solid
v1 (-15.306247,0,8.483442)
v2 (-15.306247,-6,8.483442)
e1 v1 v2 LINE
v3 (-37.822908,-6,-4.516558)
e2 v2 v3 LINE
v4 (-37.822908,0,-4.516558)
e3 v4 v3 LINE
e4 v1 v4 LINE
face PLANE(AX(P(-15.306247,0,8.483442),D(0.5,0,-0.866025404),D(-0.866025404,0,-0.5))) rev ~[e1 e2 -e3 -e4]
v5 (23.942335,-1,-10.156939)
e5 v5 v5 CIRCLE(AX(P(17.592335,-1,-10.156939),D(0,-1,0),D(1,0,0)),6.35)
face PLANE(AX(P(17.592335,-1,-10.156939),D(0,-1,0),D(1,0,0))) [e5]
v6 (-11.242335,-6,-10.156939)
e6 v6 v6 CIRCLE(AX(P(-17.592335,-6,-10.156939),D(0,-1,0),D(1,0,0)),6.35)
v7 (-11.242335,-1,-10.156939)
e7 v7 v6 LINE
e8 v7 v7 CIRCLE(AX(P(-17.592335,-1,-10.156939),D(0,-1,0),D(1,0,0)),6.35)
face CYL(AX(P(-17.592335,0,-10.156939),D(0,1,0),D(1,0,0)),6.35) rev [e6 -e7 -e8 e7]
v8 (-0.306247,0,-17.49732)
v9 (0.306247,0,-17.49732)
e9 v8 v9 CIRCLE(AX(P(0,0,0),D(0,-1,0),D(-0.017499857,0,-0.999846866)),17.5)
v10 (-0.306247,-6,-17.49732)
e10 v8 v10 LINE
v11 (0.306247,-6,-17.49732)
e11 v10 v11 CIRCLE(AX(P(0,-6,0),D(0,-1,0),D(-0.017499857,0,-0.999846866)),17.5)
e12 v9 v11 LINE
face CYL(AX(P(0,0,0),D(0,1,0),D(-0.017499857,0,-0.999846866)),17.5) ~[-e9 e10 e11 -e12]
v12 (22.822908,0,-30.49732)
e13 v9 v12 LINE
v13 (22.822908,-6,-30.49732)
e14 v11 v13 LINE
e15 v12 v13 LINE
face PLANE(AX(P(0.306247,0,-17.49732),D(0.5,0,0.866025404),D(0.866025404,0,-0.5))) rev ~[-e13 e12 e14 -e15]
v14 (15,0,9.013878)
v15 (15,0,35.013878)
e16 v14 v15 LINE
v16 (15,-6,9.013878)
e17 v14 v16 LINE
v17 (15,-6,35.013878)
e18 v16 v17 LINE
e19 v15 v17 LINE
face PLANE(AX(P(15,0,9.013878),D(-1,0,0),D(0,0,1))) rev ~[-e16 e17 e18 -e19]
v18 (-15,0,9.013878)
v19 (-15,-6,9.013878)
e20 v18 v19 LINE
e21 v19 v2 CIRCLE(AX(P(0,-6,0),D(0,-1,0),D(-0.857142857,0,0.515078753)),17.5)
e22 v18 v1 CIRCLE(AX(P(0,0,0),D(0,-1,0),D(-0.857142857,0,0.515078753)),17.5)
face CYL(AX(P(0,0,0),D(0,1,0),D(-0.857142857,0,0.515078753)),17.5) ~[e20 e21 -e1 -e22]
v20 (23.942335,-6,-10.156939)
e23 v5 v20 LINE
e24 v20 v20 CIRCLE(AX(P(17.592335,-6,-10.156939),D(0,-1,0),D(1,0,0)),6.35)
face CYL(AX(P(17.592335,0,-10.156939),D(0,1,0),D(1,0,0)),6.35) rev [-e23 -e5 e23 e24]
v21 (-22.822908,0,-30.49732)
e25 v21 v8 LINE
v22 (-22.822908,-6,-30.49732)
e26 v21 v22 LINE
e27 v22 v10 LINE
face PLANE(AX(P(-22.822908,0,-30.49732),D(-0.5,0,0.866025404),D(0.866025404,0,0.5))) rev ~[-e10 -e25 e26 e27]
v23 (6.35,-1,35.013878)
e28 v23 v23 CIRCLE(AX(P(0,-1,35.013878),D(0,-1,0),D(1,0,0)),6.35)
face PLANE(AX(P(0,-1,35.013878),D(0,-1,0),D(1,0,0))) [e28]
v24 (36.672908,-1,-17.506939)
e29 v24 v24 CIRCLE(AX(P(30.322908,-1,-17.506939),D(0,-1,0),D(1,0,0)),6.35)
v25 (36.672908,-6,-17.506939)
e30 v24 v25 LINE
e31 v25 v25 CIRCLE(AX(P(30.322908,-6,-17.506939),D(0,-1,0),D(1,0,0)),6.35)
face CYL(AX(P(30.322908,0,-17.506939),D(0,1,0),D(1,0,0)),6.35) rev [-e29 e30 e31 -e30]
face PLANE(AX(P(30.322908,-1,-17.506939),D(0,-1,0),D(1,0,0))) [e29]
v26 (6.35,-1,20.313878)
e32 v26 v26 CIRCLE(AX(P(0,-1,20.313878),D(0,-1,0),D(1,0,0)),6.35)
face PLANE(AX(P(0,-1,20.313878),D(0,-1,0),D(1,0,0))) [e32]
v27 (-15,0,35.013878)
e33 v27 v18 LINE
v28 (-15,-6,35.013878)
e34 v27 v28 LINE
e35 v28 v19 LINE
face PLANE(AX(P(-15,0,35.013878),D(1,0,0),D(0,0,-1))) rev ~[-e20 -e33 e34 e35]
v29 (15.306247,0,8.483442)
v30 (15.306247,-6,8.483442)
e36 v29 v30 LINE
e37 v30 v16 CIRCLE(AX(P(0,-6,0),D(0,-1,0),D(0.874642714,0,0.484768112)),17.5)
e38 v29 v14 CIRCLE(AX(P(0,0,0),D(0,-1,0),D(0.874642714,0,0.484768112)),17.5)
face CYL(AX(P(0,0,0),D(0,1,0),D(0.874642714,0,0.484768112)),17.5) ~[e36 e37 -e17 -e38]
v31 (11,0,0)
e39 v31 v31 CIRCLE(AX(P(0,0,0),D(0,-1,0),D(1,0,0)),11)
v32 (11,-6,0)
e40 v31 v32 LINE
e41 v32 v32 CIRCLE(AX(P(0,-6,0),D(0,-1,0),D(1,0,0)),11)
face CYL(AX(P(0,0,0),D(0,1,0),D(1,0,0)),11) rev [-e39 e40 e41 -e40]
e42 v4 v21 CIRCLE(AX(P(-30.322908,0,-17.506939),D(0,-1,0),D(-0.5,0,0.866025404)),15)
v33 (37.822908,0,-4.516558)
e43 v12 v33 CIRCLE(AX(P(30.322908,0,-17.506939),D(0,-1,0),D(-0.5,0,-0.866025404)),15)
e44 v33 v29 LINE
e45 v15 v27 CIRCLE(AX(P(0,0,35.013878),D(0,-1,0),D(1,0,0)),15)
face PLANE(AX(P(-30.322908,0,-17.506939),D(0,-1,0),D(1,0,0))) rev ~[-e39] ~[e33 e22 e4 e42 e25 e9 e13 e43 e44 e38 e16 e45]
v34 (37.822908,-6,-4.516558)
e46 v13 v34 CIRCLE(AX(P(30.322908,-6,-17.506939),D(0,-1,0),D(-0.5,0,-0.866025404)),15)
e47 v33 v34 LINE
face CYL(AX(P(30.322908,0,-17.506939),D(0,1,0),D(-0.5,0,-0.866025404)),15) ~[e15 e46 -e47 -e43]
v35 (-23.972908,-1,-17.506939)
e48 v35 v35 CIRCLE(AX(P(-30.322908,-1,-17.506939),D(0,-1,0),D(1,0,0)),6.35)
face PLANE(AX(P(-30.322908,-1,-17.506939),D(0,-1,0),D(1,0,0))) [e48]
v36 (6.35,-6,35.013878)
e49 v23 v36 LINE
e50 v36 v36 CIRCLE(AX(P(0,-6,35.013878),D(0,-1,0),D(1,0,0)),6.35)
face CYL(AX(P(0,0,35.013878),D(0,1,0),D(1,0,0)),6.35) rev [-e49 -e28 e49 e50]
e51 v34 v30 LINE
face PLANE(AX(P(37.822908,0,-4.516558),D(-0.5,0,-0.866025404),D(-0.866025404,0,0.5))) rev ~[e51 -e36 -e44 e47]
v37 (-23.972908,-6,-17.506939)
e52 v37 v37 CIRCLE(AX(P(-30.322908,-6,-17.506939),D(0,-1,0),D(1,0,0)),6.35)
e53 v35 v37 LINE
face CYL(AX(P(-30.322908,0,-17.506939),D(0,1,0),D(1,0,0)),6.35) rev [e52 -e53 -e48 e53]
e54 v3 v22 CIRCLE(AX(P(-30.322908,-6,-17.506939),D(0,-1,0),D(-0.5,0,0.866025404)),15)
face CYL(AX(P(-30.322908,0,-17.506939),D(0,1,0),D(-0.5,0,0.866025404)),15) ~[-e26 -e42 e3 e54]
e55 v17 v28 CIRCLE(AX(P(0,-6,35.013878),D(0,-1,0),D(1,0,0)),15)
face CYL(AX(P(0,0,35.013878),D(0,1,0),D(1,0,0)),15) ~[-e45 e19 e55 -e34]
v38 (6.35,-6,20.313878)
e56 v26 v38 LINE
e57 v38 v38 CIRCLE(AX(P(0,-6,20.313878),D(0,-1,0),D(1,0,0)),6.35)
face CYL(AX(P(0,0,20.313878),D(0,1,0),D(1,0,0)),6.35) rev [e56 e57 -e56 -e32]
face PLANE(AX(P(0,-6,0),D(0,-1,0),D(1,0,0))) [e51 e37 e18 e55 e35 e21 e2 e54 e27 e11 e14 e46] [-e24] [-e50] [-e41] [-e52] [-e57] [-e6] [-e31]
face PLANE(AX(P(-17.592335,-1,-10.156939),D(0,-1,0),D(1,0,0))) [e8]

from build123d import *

# Parameters (mm, degrees)
F0_R     = 6.35
F0_R_2   = 11
F1_DEPTH = 6
F2_DEPTH = 1


# Not quite as in the source:
# - a feature names something its author has since deleted; it is built from what else it names


with BuildPart() as f1:
    # F0 (on Front) → F1 (new body)
    with BuildSketch(Plane.XZ):
        with BuildLine():
            Line((-22.8229079964, -30.4973201511), (-0.306247498, -17.4973201511))
            ThreePointArc((-0.306247498, -17.4973201511), (0, -17.5), (0.306247498, -17.4973201511))
            Line((0.306247498, -17.4973201511), (22.8229079964, -30.4973201511))
            ThreePointArc((22.8229079964, -30.4973201511), (43.3132890532, -25.0069390943), (37.8229079964, -4.5165580376))
            Line((37.8229079964, -4.5165580376), (15.306247498, 8.4834419624))
            ThreePointArc((15.306247498, 8.4834419624), (15.1554445662, 8.75), (15, 9.0138781887))
            Line((15, 9.0138781887), (15, 35.0138781887))
            ThreePointArc((15, 35.0138781887), (0, 50.0138781887), (-15, 35.0138781887))
            Line((-15, 35.0138781887), (-15, 9.0138781887))
            ThreePointArc((-15, 9.0138781887), (-15.1554445662, 8.75), (-15.306247498, 8.4834419624))
            Line((-15.306247498, 8.4834419624), (-37.8229079964, -4.5165580376))
            ThreePointArc((-37.8229079964, -4.5165580376), (-43.3132890532, -25.0069390943), (-22.8229079964, -30.4973201511))
        make_face()
        with Locations((-30.3229079964, -17.5069390943)):
            Circle(F0_R, mode=Mode.SUBTRACT)
        with Locations((-17.5923345608, -10.1569390943)):
            Circle(F0_R, mode=Mode.SUBTRACT)
        with Locations((30.3229079964, -17.5069390943)):
            Circle(F0_R, mode=Mode.SUBTRACT)
        with Locations((17.5923345608, -10.1569390943)):
            Circle(F0_R, mode=Mode.SUBTRACT)
        Circle(F0_R_2, mode=Mode.SUBTRACT)
        with Locations((0, 20.3138781887)):
            Circle(F0_R, mode=Mode.SUBTRACT)
        with Locations((0, 35.0138781887)):
            Circle(F0_R, mode=Mode.SUBTRACT)
    extrude(amount=F1_DEPTH)

    # F0 (on Front) → F2 (join)
    with BuildSketch(Plane.XZ):
        with Locations((-30.3229079964, -17.5069390943)):
            Circle(F0_R)
        with Locations((-17.5923345608, -10.1569390943)):
            Circle(F0_R)
        with Locations((17.5923345608, -10.1569390943)):
            Circle(F0_R)
        with Locations((30.3229079964, -17.5069390943)):
            Circle(F0_R)
        with Locations((0, 20.3138781887)):
            Circle(F0_R)
        with Locations((0, 35.0138781887)):
            Circle(F0_R)
    extrude(amount=F2_DEPTH)


solid = f1.part
